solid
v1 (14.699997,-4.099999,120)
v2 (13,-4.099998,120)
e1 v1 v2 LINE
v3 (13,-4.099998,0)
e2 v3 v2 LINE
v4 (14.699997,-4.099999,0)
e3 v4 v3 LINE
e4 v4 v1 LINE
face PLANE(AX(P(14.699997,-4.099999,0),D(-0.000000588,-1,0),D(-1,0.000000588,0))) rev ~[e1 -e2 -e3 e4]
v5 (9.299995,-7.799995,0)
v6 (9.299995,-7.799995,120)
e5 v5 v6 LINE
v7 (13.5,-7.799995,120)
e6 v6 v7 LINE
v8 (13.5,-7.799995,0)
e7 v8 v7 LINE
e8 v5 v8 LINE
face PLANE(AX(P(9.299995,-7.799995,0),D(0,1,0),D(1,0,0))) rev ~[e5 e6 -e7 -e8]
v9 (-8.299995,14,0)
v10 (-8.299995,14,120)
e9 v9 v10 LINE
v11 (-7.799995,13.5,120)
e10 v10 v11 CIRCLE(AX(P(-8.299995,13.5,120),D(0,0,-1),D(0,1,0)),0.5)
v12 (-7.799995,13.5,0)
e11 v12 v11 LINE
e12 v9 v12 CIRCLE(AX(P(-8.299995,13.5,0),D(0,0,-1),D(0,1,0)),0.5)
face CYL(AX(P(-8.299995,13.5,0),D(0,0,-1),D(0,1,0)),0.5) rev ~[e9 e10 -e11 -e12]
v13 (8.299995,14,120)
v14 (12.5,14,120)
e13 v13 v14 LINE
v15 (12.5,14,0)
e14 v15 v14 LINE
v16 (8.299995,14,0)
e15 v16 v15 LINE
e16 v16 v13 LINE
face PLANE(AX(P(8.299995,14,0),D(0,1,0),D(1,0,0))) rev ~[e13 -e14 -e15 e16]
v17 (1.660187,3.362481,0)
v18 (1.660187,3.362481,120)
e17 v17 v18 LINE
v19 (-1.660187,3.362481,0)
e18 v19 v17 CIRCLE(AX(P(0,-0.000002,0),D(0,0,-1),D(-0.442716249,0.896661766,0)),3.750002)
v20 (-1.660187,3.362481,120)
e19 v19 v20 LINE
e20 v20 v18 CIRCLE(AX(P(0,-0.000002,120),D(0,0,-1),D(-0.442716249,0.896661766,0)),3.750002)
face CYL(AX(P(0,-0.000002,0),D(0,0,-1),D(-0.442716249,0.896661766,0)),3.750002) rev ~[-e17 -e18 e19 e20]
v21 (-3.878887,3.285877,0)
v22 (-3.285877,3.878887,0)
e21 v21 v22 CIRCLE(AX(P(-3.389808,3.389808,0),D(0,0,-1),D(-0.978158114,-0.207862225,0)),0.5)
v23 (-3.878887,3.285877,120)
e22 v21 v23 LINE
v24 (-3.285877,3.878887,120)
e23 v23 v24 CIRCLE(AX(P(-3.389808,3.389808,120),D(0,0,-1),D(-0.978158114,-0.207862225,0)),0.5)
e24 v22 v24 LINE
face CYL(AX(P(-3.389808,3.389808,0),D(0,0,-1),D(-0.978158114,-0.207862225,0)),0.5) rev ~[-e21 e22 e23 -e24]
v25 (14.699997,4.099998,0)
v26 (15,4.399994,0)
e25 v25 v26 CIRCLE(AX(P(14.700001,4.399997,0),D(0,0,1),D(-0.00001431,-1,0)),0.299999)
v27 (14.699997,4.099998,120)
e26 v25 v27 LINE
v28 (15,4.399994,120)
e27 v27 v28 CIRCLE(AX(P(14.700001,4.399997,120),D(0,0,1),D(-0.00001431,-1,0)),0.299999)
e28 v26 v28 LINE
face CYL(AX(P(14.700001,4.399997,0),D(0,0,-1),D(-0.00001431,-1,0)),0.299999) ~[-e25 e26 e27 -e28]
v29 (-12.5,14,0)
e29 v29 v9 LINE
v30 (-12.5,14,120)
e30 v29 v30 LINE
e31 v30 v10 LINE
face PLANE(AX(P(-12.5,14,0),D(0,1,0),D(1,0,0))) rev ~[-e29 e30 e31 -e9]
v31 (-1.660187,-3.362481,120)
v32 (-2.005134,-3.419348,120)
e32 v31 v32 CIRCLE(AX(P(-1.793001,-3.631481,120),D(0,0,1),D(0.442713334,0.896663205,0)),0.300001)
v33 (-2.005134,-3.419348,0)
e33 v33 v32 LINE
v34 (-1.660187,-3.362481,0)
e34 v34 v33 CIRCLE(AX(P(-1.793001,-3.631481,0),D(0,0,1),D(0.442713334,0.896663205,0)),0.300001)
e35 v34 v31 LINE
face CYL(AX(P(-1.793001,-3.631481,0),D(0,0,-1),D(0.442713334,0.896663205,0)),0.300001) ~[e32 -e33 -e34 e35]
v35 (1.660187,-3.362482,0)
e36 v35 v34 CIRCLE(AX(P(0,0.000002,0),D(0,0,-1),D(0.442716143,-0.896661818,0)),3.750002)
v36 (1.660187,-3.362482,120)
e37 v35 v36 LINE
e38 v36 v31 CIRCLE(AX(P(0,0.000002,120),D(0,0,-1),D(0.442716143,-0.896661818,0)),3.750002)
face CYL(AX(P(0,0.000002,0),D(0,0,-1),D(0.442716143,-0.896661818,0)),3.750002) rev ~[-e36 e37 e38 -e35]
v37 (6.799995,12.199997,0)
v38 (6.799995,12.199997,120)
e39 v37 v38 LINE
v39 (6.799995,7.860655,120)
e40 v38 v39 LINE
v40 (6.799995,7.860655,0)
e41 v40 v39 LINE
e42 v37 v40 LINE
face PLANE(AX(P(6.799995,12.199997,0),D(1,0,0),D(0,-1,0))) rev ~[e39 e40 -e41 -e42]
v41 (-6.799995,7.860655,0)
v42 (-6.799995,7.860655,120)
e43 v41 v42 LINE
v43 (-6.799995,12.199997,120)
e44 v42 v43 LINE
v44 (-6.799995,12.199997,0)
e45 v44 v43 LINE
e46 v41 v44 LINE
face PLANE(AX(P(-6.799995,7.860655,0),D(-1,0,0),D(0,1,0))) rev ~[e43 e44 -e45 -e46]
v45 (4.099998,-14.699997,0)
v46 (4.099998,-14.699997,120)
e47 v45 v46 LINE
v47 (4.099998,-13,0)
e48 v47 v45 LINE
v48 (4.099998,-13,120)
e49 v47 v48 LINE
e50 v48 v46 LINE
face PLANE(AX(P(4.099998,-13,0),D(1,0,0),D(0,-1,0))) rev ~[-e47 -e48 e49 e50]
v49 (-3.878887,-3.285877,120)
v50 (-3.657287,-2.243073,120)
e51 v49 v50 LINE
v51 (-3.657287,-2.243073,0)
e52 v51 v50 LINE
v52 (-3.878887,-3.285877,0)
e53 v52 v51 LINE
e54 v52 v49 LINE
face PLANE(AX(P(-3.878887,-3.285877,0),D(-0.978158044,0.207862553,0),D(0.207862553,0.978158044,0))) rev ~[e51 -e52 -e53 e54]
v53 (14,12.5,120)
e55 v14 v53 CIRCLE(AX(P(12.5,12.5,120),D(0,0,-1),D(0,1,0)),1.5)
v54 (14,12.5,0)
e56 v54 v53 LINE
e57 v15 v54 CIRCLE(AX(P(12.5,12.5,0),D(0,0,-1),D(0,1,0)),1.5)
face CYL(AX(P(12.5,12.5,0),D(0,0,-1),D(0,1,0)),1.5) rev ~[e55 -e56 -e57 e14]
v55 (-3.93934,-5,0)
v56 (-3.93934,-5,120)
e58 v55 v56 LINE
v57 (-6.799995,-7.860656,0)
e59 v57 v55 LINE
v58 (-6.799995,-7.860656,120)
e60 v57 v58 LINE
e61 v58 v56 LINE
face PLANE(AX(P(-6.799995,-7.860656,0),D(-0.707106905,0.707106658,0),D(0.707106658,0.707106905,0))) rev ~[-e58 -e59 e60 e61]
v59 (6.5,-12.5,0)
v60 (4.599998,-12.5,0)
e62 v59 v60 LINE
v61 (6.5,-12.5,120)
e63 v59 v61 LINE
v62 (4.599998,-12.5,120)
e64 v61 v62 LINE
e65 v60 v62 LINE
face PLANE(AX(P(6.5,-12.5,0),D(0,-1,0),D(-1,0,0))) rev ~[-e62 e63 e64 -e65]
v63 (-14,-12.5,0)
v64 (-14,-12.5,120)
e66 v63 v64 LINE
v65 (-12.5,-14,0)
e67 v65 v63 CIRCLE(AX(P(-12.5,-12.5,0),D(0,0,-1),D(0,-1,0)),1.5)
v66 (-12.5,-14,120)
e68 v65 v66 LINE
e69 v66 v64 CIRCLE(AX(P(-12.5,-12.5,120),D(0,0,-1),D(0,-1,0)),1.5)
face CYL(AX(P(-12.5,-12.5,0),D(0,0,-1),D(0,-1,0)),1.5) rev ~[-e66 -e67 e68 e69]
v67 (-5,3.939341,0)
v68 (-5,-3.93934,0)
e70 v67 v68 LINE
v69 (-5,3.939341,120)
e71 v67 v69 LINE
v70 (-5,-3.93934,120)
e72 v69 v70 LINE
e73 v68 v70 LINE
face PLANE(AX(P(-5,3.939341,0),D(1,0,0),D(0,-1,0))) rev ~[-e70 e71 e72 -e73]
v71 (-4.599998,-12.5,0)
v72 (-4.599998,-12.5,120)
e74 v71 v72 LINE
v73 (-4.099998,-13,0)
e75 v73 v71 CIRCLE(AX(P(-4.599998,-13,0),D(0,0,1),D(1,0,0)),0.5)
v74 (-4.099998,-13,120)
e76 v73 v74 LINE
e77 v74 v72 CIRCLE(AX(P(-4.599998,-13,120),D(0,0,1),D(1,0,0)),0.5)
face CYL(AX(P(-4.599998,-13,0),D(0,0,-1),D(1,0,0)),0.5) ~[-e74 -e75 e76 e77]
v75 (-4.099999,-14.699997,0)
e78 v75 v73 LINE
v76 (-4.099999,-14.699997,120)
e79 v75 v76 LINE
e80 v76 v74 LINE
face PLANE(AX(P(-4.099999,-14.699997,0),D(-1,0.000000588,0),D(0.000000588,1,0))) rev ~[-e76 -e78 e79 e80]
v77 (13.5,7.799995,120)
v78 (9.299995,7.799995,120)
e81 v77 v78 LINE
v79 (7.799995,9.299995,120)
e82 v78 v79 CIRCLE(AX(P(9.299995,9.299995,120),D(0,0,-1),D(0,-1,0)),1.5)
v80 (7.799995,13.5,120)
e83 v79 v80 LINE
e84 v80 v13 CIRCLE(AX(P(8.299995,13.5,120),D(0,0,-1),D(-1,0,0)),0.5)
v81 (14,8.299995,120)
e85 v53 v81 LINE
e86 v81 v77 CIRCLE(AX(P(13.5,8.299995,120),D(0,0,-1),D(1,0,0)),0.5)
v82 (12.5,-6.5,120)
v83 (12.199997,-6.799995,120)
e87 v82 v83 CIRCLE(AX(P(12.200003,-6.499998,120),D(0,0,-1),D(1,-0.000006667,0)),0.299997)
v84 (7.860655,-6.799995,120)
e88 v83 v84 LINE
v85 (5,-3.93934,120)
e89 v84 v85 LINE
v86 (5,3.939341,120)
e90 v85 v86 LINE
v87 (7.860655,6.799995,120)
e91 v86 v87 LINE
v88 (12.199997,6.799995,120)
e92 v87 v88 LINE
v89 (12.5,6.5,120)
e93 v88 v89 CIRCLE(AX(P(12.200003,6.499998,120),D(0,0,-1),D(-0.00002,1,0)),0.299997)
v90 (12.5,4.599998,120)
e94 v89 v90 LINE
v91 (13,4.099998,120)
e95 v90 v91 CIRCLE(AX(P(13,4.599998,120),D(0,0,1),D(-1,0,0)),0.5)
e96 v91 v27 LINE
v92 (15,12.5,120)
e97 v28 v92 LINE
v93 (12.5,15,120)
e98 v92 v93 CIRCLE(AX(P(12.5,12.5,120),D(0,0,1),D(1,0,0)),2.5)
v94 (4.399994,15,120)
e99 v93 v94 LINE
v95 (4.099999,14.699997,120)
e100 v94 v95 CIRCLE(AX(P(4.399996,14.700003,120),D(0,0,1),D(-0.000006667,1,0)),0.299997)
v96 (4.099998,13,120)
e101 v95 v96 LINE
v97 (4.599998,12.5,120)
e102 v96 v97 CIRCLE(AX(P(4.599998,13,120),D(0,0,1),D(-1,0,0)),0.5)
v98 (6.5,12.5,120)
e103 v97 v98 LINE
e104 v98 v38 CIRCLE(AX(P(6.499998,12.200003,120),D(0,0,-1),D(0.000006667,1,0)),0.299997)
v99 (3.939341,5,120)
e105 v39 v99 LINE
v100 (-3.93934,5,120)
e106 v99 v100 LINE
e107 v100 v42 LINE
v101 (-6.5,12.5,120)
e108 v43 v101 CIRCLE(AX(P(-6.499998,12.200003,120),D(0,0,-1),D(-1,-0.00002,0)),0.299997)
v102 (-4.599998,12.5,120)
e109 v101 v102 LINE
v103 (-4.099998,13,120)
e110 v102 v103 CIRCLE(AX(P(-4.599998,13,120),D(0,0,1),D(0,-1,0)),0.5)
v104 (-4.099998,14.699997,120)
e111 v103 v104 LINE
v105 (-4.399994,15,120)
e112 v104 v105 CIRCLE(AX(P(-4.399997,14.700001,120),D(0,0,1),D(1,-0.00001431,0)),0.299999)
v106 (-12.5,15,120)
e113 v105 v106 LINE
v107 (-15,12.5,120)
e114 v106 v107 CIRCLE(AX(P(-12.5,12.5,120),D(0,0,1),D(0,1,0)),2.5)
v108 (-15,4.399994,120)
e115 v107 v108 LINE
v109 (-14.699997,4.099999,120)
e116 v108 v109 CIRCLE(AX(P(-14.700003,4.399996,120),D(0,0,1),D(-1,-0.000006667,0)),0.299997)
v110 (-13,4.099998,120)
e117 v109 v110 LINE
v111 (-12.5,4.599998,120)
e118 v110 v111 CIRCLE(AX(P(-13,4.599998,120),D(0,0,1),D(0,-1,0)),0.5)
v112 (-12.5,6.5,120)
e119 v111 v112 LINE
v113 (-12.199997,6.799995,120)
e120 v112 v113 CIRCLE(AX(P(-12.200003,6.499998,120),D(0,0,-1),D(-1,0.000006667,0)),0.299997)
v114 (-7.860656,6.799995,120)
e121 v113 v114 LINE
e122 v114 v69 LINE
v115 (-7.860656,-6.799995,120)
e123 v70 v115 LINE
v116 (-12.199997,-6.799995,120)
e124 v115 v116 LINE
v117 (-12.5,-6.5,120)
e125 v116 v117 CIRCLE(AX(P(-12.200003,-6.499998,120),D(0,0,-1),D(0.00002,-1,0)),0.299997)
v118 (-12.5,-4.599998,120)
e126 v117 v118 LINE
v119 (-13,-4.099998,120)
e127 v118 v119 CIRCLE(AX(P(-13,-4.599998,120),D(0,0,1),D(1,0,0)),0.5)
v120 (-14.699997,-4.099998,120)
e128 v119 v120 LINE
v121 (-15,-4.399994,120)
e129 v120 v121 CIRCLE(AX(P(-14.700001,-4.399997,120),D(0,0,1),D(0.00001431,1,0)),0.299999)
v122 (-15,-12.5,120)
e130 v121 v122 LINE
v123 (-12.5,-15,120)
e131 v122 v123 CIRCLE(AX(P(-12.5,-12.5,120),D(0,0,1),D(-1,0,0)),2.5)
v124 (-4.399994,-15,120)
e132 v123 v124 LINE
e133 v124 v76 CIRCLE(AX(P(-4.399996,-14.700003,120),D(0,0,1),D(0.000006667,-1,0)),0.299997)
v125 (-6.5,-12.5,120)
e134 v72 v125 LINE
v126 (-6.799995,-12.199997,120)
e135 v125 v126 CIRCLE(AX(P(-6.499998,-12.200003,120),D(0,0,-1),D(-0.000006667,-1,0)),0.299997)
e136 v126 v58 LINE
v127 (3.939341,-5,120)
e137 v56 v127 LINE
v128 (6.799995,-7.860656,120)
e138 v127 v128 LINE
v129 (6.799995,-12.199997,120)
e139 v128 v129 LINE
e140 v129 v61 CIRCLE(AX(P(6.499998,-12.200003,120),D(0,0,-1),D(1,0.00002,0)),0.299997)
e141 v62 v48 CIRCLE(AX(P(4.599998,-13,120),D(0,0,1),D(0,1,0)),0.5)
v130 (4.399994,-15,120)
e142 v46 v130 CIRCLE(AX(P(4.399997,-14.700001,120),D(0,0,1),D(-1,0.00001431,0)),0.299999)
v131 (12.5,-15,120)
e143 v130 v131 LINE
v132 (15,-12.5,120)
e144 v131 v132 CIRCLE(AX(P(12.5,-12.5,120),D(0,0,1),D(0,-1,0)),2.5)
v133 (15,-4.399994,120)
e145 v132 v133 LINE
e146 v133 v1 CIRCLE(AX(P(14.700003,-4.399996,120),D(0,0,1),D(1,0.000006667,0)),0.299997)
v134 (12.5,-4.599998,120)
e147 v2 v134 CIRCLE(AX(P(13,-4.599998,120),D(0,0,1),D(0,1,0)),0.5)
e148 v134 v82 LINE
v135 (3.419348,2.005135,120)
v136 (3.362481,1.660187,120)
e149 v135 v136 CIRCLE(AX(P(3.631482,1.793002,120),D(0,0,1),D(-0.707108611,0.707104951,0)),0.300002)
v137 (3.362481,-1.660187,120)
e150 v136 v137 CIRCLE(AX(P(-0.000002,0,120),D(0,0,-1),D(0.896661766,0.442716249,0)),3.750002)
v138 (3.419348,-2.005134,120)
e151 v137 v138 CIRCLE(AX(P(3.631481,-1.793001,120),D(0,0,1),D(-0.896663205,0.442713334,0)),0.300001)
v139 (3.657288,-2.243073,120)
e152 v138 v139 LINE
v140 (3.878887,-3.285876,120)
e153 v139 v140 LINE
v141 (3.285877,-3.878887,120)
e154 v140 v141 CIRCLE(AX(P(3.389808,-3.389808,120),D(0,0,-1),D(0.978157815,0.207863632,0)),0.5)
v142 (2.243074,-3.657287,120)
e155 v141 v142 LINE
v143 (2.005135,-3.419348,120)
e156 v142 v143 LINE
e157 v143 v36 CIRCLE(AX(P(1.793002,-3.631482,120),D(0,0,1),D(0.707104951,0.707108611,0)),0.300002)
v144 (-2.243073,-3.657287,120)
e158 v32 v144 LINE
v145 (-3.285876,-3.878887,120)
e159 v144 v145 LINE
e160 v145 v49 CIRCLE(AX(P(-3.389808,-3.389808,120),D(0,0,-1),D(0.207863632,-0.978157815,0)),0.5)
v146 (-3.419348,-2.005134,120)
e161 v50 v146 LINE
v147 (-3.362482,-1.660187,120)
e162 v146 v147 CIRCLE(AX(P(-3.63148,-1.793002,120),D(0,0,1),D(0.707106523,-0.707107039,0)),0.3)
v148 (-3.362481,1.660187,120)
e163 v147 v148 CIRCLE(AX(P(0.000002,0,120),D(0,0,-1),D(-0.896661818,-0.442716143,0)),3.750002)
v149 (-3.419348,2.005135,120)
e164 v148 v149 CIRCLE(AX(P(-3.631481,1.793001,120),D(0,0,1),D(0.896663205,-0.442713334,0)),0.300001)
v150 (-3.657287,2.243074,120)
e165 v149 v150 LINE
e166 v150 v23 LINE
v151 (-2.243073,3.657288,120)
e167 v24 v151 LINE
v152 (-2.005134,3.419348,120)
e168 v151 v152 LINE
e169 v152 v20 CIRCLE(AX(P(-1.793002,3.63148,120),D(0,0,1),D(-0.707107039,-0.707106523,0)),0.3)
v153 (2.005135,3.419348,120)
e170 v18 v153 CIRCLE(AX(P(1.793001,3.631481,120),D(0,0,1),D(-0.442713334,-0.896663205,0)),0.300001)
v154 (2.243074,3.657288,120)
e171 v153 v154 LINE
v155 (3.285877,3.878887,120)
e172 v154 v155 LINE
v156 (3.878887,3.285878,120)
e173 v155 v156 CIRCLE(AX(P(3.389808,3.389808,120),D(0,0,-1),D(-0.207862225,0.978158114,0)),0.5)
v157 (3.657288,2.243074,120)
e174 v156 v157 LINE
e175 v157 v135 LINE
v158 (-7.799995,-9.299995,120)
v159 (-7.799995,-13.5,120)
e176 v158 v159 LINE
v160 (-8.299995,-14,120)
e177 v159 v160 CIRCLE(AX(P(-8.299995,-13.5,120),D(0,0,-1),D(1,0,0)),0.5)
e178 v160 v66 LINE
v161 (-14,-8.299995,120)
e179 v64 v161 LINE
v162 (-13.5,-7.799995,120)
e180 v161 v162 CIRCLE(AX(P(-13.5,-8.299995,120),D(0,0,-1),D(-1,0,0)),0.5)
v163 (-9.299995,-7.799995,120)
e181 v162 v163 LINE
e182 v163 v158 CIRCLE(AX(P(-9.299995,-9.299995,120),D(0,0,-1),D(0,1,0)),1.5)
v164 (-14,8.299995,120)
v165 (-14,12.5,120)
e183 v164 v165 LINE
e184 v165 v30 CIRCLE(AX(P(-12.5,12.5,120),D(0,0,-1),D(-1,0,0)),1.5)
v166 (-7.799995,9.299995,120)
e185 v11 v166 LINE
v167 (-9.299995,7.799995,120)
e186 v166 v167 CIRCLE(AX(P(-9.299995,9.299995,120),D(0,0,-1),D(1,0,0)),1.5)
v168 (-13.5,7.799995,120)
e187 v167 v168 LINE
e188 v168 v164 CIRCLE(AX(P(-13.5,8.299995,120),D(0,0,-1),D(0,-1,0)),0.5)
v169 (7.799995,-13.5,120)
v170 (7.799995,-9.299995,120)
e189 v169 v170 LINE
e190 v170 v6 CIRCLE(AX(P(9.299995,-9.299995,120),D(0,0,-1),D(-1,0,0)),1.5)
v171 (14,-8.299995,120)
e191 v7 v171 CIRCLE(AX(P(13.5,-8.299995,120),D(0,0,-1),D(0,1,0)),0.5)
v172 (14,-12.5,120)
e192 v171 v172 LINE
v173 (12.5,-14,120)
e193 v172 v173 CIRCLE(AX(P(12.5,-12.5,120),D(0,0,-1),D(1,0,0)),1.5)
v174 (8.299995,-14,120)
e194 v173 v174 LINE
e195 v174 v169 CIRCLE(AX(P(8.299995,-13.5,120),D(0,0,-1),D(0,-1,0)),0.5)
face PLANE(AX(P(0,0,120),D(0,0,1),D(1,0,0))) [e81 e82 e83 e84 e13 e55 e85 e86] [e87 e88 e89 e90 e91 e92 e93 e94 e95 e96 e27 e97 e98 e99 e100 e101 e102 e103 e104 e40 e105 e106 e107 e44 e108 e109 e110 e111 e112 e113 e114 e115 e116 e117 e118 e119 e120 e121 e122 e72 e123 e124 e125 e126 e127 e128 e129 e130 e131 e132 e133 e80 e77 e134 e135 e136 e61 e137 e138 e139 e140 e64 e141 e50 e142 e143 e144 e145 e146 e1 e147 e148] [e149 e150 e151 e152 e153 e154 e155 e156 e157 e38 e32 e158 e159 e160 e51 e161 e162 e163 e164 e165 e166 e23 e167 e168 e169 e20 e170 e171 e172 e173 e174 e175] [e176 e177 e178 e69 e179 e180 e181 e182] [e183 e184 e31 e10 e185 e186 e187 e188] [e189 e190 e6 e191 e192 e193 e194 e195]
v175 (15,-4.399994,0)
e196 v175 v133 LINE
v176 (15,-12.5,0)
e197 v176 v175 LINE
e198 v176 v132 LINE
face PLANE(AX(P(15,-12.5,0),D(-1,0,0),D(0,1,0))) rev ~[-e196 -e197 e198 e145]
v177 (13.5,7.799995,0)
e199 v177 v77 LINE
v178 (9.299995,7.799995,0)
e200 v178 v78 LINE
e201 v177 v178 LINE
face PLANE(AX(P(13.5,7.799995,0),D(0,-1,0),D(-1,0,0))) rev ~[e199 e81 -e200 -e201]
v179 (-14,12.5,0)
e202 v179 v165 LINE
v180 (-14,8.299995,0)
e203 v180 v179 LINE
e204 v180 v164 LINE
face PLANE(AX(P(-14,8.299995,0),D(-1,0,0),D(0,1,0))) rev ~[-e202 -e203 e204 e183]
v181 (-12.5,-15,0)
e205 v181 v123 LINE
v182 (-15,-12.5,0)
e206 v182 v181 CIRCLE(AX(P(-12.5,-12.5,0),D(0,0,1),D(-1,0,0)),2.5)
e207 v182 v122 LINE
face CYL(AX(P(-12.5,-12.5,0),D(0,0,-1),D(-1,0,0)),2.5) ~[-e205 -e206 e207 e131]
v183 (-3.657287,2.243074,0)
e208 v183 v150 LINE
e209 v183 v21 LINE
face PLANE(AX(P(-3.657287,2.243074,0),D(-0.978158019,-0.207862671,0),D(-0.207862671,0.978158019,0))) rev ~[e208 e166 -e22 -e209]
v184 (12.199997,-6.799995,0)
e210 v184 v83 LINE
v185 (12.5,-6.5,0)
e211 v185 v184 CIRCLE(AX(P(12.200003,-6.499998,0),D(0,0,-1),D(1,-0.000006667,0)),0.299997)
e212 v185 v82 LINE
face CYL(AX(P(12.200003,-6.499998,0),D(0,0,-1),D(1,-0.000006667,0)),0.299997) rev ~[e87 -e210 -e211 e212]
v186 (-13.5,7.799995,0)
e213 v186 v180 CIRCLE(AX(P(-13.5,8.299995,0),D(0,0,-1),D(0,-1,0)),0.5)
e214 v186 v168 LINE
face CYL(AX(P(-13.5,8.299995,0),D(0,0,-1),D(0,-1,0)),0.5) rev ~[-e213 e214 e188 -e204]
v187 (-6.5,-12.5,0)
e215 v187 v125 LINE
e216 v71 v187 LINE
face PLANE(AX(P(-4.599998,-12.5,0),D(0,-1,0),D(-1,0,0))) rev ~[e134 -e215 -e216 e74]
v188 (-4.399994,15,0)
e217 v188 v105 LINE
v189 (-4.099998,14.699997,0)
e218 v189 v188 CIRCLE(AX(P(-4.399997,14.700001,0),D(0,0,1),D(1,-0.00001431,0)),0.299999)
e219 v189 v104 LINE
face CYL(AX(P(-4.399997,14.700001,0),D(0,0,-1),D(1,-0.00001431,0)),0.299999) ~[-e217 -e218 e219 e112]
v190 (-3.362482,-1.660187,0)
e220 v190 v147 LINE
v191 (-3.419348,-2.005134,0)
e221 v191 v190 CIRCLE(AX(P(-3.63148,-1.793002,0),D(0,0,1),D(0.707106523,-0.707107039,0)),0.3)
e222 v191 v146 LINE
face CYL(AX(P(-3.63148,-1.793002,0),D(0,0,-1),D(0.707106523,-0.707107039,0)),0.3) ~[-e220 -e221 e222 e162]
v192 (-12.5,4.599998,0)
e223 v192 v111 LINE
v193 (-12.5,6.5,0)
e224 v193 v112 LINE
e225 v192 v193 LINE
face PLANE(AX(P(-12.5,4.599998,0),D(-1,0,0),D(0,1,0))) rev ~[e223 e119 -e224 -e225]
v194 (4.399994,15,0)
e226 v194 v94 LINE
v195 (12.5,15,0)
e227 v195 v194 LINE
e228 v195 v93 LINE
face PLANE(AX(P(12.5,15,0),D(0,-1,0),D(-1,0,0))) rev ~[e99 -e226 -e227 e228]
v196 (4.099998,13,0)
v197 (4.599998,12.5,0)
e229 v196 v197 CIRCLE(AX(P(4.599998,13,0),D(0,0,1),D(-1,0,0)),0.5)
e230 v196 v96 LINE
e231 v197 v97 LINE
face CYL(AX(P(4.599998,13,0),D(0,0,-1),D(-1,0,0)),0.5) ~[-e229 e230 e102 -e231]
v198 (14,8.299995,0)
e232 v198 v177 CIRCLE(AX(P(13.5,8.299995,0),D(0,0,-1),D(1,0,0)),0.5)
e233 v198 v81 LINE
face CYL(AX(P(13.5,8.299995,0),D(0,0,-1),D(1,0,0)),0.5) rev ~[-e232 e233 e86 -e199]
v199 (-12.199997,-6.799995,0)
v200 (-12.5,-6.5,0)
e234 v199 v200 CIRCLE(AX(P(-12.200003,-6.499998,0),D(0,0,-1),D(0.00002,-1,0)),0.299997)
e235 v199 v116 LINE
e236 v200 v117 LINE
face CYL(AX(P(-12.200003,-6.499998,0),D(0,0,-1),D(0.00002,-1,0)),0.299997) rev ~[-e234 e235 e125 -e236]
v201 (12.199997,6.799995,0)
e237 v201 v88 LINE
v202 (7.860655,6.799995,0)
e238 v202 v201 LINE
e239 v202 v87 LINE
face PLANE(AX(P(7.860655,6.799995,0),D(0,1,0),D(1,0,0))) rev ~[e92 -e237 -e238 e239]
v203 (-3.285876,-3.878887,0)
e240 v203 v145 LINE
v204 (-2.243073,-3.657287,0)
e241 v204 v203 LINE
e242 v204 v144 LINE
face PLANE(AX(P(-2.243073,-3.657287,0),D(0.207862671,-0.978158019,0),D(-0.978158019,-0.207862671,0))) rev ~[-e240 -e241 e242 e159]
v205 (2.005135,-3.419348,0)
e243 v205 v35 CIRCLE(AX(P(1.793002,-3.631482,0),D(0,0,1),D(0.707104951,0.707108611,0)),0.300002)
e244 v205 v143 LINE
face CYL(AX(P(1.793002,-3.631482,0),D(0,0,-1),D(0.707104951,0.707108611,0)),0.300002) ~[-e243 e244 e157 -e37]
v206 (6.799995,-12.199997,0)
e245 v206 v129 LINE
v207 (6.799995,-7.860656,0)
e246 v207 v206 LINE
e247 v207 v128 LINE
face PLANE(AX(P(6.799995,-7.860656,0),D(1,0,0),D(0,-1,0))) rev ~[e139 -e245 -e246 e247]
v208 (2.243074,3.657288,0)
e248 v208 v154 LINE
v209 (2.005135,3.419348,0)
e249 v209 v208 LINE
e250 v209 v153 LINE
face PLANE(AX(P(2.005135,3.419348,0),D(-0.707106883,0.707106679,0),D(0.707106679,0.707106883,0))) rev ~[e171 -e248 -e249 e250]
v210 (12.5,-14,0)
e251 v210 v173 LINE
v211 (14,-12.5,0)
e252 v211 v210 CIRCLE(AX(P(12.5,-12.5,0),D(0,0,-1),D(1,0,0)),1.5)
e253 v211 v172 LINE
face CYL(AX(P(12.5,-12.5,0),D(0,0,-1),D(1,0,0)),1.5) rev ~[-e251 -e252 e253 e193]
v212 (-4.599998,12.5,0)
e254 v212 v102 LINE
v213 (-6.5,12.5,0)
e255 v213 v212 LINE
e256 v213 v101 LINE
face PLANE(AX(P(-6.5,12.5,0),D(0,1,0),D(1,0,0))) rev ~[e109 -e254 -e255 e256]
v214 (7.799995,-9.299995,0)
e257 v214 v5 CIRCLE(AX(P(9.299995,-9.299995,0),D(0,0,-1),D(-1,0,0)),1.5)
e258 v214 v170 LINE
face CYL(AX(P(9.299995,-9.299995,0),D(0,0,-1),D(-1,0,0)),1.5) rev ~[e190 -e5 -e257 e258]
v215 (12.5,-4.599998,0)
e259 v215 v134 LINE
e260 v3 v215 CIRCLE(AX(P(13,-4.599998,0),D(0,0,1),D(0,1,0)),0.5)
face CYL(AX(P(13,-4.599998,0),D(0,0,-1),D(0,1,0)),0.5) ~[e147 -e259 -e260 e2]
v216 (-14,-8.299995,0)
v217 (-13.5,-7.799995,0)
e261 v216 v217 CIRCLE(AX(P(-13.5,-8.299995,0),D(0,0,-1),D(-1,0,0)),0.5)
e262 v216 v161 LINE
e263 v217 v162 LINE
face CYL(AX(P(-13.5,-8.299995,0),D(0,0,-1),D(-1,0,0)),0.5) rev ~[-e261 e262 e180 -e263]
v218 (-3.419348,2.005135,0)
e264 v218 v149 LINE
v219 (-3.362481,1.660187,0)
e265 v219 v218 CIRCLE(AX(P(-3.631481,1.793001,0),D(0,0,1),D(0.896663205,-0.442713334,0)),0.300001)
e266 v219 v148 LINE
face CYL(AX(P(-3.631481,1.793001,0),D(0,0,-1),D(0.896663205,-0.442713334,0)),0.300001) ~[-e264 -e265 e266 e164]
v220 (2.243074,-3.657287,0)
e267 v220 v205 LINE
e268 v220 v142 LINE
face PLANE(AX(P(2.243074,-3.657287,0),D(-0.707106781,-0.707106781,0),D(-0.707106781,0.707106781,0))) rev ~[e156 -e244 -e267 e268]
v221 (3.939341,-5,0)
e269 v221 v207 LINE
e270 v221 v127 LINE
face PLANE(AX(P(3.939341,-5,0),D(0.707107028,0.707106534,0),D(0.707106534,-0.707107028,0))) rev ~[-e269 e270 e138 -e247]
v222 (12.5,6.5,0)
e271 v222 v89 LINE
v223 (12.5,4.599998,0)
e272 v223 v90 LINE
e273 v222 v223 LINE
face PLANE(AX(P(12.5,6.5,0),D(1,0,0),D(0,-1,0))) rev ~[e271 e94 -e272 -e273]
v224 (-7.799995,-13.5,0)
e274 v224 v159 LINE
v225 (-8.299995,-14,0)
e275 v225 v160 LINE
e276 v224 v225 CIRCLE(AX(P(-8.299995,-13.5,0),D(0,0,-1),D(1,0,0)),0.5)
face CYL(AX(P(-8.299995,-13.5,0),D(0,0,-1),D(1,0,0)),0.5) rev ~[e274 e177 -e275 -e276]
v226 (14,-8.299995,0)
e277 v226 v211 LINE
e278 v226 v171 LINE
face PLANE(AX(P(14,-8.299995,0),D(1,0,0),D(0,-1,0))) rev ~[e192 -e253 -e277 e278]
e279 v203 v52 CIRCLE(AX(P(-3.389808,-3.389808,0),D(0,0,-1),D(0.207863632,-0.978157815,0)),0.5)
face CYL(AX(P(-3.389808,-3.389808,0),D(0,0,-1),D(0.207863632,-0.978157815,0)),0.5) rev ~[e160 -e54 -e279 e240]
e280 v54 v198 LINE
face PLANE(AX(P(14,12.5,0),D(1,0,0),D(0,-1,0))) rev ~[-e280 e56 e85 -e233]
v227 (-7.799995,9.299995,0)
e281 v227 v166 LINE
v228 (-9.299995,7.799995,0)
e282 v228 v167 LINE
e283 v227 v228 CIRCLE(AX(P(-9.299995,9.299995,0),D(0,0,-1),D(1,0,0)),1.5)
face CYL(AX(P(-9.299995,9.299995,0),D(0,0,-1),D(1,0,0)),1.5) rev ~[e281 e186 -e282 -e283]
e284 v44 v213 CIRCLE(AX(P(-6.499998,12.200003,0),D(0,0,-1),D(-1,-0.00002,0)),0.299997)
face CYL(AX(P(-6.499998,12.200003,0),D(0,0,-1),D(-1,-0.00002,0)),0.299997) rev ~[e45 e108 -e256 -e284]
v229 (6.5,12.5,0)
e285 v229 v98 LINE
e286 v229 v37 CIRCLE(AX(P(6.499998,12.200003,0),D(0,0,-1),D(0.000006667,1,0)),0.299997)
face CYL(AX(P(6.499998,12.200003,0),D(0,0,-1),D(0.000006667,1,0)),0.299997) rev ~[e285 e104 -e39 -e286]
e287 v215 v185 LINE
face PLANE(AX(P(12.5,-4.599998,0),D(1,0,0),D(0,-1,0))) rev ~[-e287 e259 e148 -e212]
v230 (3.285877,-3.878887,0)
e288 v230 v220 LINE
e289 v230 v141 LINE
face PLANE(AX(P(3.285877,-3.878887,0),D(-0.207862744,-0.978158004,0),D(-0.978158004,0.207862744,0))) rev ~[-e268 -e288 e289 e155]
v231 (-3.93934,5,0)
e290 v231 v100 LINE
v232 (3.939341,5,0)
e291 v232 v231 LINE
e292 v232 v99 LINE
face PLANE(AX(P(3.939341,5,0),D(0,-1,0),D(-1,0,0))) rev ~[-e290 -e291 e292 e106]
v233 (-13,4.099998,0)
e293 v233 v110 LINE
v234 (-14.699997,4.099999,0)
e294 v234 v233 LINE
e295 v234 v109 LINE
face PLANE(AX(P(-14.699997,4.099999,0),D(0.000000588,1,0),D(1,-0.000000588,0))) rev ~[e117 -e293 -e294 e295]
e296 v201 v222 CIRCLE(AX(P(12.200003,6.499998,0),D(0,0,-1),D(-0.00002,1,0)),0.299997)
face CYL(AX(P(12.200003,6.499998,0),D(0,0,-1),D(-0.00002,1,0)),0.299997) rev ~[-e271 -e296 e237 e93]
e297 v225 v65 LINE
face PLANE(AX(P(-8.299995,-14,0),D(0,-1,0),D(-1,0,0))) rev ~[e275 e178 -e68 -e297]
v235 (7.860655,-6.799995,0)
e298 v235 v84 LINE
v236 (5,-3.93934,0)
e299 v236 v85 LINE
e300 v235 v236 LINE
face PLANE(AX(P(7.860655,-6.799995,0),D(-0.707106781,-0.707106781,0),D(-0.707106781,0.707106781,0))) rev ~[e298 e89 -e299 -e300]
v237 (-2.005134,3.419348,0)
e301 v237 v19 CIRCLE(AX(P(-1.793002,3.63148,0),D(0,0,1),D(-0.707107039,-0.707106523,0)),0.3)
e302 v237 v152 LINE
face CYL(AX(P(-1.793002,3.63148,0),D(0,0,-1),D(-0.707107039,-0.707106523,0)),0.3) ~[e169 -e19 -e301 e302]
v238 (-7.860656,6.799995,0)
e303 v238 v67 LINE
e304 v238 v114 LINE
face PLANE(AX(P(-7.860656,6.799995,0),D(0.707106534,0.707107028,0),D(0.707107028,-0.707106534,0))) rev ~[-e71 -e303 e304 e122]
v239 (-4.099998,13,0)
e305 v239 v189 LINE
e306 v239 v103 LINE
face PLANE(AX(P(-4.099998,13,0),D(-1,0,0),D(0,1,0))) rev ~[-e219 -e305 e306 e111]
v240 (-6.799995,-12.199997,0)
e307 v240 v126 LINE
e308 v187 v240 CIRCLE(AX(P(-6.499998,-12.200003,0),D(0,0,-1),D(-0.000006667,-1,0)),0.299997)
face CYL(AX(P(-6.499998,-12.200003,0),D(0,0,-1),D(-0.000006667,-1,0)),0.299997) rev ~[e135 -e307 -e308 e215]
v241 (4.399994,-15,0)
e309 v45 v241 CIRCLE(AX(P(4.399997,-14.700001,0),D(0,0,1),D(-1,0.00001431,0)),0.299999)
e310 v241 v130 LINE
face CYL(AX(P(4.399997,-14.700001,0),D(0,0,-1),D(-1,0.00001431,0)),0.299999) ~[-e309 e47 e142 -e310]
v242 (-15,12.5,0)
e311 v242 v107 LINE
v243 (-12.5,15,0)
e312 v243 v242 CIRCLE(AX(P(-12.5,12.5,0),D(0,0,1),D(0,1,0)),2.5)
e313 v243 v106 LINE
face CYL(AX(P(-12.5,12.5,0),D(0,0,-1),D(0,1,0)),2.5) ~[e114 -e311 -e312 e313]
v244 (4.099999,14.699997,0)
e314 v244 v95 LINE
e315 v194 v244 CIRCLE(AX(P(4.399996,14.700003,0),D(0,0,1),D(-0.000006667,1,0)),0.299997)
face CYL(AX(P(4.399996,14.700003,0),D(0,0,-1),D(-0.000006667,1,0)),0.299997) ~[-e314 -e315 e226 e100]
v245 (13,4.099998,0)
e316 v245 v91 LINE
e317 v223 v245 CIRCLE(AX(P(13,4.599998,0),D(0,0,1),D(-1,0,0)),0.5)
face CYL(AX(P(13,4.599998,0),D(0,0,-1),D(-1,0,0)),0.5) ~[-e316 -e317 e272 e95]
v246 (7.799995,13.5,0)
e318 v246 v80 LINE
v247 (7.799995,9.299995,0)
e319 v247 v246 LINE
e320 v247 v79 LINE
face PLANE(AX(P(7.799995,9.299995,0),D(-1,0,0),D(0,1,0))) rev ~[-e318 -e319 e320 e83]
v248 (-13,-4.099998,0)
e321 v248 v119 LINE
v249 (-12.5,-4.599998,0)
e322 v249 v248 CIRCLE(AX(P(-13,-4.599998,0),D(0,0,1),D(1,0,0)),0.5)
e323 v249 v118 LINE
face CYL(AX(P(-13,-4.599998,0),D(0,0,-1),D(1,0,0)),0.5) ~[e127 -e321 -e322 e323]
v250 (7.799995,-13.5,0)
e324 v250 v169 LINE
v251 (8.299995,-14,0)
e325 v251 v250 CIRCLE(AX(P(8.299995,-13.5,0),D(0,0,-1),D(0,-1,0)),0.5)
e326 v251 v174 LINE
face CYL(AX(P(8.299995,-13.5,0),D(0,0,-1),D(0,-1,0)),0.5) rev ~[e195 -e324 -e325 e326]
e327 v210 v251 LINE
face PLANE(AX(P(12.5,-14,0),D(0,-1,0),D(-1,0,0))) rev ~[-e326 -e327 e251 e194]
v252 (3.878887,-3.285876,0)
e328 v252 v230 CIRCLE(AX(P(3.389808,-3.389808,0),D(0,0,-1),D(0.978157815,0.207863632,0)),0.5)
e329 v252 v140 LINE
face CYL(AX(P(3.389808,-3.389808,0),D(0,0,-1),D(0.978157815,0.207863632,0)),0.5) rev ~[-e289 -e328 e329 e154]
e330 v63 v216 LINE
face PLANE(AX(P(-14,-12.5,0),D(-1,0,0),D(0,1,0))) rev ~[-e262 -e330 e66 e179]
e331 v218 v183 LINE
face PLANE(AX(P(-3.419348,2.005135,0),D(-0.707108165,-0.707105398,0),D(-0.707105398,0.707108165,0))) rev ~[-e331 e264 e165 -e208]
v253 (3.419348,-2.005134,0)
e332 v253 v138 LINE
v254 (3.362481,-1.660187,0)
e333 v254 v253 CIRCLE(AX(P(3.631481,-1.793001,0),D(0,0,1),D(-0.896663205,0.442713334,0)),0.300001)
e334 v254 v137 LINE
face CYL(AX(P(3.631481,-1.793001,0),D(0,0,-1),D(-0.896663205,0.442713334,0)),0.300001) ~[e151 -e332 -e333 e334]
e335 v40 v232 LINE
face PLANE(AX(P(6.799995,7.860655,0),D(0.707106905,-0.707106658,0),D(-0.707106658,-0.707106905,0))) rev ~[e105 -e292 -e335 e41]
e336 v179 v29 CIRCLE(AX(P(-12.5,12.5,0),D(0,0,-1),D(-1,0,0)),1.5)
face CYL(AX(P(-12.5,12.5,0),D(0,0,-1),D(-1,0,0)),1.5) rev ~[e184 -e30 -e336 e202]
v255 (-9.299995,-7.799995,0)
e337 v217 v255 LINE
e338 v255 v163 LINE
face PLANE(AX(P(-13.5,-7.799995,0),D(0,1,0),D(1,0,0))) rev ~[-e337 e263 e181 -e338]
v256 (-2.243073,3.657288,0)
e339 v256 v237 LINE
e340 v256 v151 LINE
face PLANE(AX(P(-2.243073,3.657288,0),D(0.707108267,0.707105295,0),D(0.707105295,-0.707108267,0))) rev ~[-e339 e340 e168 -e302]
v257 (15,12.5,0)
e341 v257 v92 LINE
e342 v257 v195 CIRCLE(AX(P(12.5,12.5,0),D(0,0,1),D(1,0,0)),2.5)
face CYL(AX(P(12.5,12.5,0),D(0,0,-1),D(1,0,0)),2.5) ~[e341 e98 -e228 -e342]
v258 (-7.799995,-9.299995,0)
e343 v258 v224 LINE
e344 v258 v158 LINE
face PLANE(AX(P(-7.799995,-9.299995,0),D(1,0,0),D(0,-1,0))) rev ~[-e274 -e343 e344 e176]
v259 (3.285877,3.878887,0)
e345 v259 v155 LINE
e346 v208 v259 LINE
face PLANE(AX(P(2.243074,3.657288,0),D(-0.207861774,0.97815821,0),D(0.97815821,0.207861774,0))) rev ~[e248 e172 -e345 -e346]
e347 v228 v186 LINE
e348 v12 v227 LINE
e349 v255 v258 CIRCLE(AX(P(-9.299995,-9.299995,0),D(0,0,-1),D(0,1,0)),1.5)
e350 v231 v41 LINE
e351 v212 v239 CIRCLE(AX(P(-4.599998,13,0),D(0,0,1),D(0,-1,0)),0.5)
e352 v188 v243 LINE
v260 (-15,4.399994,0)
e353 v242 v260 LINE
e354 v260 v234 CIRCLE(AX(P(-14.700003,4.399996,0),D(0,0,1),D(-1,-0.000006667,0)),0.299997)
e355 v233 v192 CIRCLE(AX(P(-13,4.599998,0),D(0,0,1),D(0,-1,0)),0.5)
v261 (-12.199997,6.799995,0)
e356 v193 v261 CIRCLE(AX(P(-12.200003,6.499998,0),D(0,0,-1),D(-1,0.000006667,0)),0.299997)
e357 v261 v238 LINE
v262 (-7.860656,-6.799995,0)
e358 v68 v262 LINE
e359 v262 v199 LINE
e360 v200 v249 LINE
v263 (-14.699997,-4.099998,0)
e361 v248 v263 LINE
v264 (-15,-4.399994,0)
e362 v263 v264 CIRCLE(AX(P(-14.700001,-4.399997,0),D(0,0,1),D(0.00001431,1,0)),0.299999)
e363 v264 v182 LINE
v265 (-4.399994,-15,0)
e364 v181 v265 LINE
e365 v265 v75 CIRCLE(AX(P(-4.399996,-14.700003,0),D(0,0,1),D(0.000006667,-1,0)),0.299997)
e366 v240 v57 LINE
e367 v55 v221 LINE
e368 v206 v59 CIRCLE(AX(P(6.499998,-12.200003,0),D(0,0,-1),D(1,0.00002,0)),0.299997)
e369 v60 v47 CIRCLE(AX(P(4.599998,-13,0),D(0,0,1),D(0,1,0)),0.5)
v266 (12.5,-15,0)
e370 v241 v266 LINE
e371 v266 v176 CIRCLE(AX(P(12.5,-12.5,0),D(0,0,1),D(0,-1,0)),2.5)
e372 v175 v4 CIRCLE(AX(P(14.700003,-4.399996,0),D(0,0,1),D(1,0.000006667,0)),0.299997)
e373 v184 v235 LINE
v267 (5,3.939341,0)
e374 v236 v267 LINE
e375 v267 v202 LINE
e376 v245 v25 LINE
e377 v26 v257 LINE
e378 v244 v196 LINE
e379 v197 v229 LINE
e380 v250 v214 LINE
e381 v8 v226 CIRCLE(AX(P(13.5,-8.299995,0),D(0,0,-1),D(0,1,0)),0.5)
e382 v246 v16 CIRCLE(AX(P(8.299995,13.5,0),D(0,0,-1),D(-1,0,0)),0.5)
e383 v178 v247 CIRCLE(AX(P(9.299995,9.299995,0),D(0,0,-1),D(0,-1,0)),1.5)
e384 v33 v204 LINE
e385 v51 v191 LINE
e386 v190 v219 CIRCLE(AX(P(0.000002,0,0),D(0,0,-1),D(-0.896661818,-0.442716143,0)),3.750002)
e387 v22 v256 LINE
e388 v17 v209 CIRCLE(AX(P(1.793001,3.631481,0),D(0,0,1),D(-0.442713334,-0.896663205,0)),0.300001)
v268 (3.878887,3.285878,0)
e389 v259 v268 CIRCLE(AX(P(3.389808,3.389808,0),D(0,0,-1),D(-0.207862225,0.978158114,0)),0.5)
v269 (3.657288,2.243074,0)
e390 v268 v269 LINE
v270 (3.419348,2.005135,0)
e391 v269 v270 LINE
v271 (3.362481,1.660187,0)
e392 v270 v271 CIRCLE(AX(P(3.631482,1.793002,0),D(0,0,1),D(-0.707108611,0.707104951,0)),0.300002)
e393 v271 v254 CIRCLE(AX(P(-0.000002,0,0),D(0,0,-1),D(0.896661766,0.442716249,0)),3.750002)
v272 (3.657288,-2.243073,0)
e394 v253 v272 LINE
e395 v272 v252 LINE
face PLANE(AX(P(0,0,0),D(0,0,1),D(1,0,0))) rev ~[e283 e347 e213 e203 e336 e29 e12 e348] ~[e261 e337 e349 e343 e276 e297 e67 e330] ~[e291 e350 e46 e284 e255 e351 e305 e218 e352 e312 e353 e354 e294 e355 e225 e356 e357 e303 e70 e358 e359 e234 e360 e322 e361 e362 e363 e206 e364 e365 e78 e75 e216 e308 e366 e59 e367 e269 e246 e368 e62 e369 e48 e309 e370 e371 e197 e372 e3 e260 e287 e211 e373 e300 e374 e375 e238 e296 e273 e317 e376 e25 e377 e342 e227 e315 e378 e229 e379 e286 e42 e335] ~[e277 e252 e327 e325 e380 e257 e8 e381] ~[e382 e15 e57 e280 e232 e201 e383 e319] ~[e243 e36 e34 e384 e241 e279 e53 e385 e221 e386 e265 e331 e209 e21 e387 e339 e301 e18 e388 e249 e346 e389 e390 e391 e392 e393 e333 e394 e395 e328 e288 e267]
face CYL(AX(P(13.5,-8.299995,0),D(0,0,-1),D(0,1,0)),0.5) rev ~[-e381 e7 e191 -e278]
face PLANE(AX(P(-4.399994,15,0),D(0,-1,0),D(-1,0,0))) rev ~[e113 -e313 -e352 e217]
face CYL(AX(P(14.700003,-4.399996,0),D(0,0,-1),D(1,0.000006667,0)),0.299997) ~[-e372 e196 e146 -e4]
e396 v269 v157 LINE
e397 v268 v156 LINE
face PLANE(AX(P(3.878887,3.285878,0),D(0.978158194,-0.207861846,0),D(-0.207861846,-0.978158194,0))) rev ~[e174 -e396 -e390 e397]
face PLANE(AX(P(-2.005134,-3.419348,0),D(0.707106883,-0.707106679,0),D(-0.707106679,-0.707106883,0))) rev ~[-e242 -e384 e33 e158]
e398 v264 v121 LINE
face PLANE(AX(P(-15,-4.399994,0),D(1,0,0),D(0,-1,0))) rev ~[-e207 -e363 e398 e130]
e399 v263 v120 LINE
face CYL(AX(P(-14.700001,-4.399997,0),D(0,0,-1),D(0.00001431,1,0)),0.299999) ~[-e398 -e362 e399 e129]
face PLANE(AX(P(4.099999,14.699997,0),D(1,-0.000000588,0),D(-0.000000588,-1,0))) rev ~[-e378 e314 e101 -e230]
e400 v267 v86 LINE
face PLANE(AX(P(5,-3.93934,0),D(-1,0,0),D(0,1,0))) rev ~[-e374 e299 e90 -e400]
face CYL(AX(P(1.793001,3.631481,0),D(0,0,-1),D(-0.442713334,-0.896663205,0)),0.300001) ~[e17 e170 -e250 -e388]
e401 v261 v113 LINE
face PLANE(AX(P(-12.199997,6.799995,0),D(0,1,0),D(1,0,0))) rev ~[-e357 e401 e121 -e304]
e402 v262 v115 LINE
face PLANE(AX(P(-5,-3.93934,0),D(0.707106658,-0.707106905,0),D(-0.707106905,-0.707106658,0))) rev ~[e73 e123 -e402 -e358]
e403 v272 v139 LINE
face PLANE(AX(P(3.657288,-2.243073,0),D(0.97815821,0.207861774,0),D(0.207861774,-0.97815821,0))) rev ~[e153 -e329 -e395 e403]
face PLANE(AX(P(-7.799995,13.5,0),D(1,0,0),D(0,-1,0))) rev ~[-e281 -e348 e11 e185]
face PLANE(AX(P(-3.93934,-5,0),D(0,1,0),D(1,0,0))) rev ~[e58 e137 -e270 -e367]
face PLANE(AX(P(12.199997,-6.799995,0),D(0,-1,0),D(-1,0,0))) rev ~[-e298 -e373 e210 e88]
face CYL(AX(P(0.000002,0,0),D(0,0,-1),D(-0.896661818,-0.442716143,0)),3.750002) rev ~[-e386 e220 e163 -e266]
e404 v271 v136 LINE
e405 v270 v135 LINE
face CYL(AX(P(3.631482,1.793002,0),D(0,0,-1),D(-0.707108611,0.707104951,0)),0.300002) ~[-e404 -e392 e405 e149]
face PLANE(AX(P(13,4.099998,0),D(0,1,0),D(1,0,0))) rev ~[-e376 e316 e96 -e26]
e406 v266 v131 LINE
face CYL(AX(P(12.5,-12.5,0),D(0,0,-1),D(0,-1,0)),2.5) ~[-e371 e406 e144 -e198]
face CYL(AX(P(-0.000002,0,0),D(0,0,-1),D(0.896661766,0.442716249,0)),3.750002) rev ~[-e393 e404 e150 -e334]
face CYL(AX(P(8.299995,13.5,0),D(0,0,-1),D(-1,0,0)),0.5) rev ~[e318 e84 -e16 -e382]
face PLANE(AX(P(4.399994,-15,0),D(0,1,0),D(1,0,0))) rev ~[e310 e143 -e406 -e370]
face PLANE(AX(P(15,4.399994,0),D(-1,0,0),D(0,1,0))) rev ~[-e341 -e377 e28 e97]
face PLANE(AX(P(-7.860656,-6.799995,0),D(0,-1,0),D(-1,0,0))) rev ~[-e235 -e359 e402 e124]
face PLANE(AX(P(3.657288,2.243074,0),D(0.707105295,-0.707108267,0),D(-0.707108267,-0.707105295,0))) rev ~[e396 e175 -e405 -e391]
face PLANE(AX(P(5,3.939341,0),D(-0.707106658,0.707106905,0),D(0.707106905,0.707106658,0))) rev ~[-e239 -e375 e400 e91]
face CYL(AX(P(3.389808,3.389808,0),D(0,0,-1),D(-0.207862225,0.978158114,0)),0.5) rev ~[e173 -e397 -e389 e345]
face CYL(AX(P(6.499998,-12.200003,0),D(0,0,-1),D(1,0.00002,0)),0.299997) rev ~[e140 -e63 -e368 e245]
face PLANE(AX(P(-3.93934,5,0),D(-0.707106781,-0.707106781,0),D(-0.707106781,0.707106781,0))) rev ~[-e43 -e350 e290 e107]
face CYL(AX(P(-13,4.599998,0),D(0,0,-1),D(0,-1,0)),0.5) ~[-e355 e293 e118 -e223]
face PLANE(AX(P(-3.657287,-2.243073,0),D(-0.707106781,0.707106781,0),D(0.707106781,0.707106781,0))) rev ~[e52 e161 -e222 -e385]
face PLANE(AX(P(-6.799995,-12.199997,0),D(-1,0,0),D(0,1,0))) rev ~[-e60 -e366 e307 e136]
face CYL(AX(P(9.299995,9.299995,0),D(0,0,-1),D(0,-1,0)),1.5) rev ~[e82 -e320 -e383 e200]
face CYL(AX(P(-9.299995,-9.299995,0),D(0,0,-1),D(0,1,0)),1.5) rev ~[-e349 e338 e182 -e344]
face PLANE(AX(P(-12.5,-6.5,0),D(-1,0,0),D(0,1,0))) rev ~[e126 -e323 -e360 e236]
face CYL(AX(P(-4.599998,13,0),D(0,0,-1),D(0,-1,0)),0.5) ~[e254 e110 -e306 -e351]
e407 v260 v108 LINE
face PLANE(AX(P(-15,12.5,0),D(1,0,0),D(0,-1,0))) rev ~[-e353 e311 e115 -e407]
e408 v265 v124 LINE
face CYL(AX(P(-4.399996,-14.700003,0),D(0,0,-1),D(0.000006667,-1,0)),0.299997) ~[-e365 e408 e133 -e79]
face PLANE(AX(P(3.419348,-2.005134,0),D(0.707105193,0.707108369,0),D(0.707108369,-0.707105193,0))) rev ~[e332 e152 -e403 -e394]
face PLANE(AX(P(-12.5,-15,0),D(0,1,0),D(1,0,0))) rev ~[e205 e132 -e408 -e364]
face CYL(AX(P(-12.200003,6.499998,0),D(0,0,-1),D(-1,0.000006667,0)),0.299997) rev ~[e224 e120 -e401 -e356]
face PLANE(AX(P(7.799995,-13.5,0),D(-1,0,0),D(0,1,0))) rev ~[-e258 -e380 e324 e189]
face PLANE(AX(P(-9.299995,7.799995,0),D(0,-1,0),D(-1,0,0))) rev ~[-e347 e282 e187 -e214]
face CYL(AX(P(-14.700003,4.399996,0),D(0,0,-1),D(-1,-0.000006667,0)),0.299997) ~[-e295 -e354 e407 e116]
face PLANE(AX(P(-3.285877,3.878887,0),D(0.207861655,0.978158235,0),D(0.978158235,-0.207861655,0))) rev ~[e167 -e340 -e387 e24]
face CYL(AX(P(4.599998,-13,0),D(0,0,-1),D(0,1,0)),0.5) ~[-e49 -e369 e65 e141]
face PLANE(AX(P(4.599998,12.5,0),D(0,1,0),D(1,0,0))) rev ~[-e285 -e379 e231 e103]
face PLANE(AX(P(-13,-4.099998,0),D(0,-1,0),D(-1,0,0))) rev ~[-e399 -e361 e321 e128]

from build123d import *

# Parameters (mm, degrees)
F1_DEPTH = 120


# Not quite as in the source:
# - ends of sketch curves that miss each other by under 0.0002 mm in the source are joined
# - the program builds the solid bodies; features that only make, move or delete a surface that nothing else refers to are left out


with BuildPart() as f1:
    # F0 (on Top) → F1 (new body)
    with BuildSketch(Plane.XY):
        with BuildLine():
            Line((3.939341, -5), (6.799995, -7.860656))
            Line((6.799995, -7.860656), (6.799995, -12.199997))
            ThreePointArc((6.799995, -12.199997), (6.7121307415, -12.4121300846), (6.5, -12.5))
            Line((6.5, -12.5), (4.599998, -12.5))
            ThreePointArc((4.599998, -12.5), (4.2464446094, -12.6464466094), (4.099998, -13))
            Line((4.099998, -13), (4.099998, -14.699997))
            ThreePointArc((4.099998, -14.699997), (4.1878632585, -14.9121300846), (4.399994, -15))
            Line((4.399994, -15), (12.5, -15))
            ThreePointArc((12.5, -15), (14.267766953, -14.267766953), (15, -12.5))
            Line((15, -12.5), (15, -4.399994))
            ThreePointArc((15, -4.399994), (14.9121300846, -4.1878632585), (14.699997, -4.099999))
            Line((14.699997, -4.099999), (13, -4.099998))
            ThreePointArc((13, -4.099998), (12.6464466094, -4.2464446094), (12.5, -4.599998))
            Line((12.5, -4.599998), (12.5, -6.5))
            ThreePointArc((12.5, -6.5), (12.4121300846, -6.7121307415), (12.199997, -6.799995))
            Line((12.199997, -6.799995), (7.860655, -6.799995))
            Line((7.860655, -6.799995), (5, -3.93934))
            Line((5, -3.93934), (5, 3.939341))
            Line((5, 3.939341), (7.860655, 6.799995))
            Line((7.860655, 6.799995), (12.199997, 6.799995))
            ThreePointArc((12.199997, 6.799995), (12.4121300846, 6.7121307415), (12.5, 6.5))
            Line((12.5, 6.5), (12.5, 4.599998))
            ThreePointArc((12.5, 4.599998), (12.6464466094, 4.2464446094), (13, 4.099998))
            Line((13, 4.099998), (14.699997, 4.099998))
            ThreePointArc((14.699997, 4.099998), (14.9121300846, 4.1878632585), (15, 4.399994))
            Line((15, 4.399994), (15, 12.5))
            ThreePointArc((15, 12.5), (14.267766953, 14.267766953), (12.5, 15))
            Line((12.5, 15), (4.399994, 15))
            ThreePointArc((4.399994, 15), (4.1878632585, 14.9121300846), (4.099999, 14.699997))
            Line((4.099999, 14.699997), (4.099998, 13))
            ThreePointArc((4.099998, 13), (4.2464446094, 12.6464466094), (4.599998, 12.5))
            Line((4.599998, 12.5), (6.5, 12.5))
            ThreePointArc((6.5, 12.5), (6.7121307415, 12.4121300846), (6.799995, 12.199997))
            Line((6.799995, 12.199997), (6.799995, 7.860655))
            Line((6.799995, 7.860655), (3.939341, 5))
            Line((3.939341, 5), (-3.93934, 5))
            Line((-3.93934, 5), (-6.799995, 7.860655))
            Line((-6.799995, 7.860655), (-6.799995, 12.199997))
            ThreePointArc((-6.799995, 12.199997), (-6.7121307415, 12.4121300846), (-6.5, 12.5))
            Line((-6.5, 12.5), (-4.599998, 12.5))
            ThreePointArc((-4.599998, 12.5), (-4.2464446094, 12.6464466094), (-4.099998, 13))
            Line((-4.099998, 13), (-4.099998, 14.699997))
            ThreePointArc((-4.099998, 14.699997), (-4.1878632585, 14.9121300846), (-4.399994, 15))
            Line((-4.399994, 15), (-12.5, 15))
            ThreePointArc((-12.5, 15), (-14.267766953, 14.267766953), (-15, 12.5))
            Line((-15, 12.5), (-15, 4.399994))
            ThreePointArc((-15, 4.399994), (-14.9121300846, 4.1878632585), (-14.699997, 4.099999))
            Line((-14.699997, 4.099999), (-13, 4.099998))
            ThreePointArc((-13, 4.099998), (-12.6464466094, 4.2464446094), (-12.5, 4.599998))
            Line((-12.5, 4.599998), (-12.5, 6.5))
            ThreePointArc((-12.5, 6.5), (-12.4121300846, 6.7121307415), (-12.199997, 6.799995))
            Line((-12.199997, 6.799995), (-7.860656, 6.799995))
            Line((-7.860656, 6.799995), (-5, 3.939341))
            Line((-5, 3.939341), (-5, -3.93934))
            Line((-5, -3.93934), (-7.860656, -6.799995))
            Line((-7.860656, -6.799995), (-12.199997, -6.799995))
            ThreePointArc((-12.199997, -6.799995), (-12.4121300846, -6.7121307415), (-12.5, -6.5))
            Line((-12.5, -6.5), (-12.5, -4.599998))
            ThreePointArc((-12.5, -4.599998), (-12.6464466094, -4.2464446094), (-13, -4.099998))
            Line((-13, -4.099998), (-14.699997, -4.099998))
            ThreePointArc((-14.699997, -4.099998), (-14.9121300846, -4.1878632585), (-15, -4.399994))
            Line((-15, -4.399994), (-15, -12.5))
            ThreePointArc((-15, -12.5), (-14.267766953, -14.267766953), (-12.5, -15))
            Line((-12.5, -15), (-4.399994, -15))
            ThreePointArc((-4.399994, -15), (-4.1878632585, -14.9121300846), (-4.099999, -14.699997))
            Line((-4.099999, -14.699997), (-4.099998, -13))
            ThreePointArc((-4.099998, -13), (-4.2464446094, -12.6464466094), (-4.599998, -12.5))
            Line((-4.599998, -12.5), (-6.5, -12.5))
            ThreePointArc((-6.5, -12.5), (-6.7121307415, -12.4121300846), (-6.799995, -12.199997))
            Line((-6.799995, -12.199997), (-6.799995, -7.860656))
            Line((-6.799995, -7.860656), (-3.93934, -5))
            Line((-3.93934, -5), (3.939341, -5))
        make_face()
        with BuildLine():
            Line((-8.299995, -14), (-12.5, -14))
            ThreePointArc((-12.5, -14), (-13.5606601718, -13.5606601718), (-14, -12.5))
            Line((-14, -12.5), (-14, -8.299995))
            ThreePointArc((-14, -8.299995), (-13.8535533906, -7.9464416094), (-13.5, -7.799995))
            Line((-13.5, -7.799995), (-9.299995, -7.799995))
            ThreePointArc((-9.299995, -7.799995), (-8.2393348282, -8.2393348282), (-7.799995, -9.299995))
            Line((-7.799995, -9.299995), (-7.799995, -13.5))
            ThreePointArc((-7.799995, -13.5), (-7.9464416094, -13.8535533906), (-8.299995, -14))
        make_face(mode=Mode.SUBTRACT)
        with BuildLine():
            Line((12.5, -14), (8.299995, -14))
            ThreePointArc((8.299995, -14), (7.9464416094, -13.8535533906), (7.799995, -13.5))
            Line((7.799995, -13.5), (7.799995, -9.299995))
            ThreePointArc((7.799995, -9.299995), (8.2393348282, -8.2393348282), (9.299995, -7.799995))
            Line((9.299995, -7.799995), (13.5, -7.799995))
            ThreePointArc((13.5, -7.799995), (13.8535533906, -7.9464416094), (14, -8.299995))
            Line((14, -8.299995), (14, -12.5))
            ThreePointArc((14, -12.5), (13.5606601718, -13.5606601718), (12.5, -14))
        make_face(mode=Mode.SUBTRACT)
        with BuildLine():
            Line((3.657288, -2.243073), (3.878887, -3.285876))
            ThreePointArc((3.878887, -3.285876), (3.7433613906, -3.7433613906), (3.2858769836, -3.8788870773))
            Line((3.2858769836, -3.8788870773), (2.243074, -3.657287))
            Line((2.243074, -3.657287), (2.005135, -3.419348))
            ThreePointArc((2.005135, -3.419348), (1.841799908, -3.3354753308), (1.6601868142, -3.3624816237))
            ThreePointArc((1.6601868142, -3.3624816237), (0, -3.75), (-1.6601870383, -3.3624810777))
            ThreePointArc((-1.6601870383, -3.3624810777), (-1.841799908, -3.3354753308), (-2.0051340344, -3.4193479656))
            Line((-2.0051340344, -3.4193479656), (-2.243073, -3.657287))
            Line((-2.243073, -3.657287), (-3.285876, -3.878887))
            ThreePointArc((-3.285876, -3.878887), (-3.7433613906, -3.7433613906), (-3.8788870773, -3.2858769836))
            Line((-3.8788870773, -3.2858769836), (-3.657287, -2.243073))
            Line((-3.657287, -2.243073), (-3.419348, -2.005134))
            ThreePointArc((-3.419348, -2.005134), (-3.3354753308, -1.841799908), (-3.3624816237, -1.6601868142))
            ThreePointArc((-3.3624816237, -1.6601868142), (-3.75, 0), (-3.3624810777, 1.6601870383))
            ThreePointArc((-3.3624810777, 1.6601870383), (-3.3354753883, 1.8418002569), (-3.4193484656, 2.0051345344))
            Line((-3.4193484656, 2.0051345344), (-3.657287, 2.243074))
            Line((-3.657287, 2.243074), (-3.878887, 3.285877))
            ThreePointArc((-3.878887, 3.285877), (-3.7433613906, 3.7433613906), (-3.2858769836, 3.8788870773))
            Line((-3.2858769836, 3.8788870773), (-2.243073, 3.657288))
            Line((-2.243073, 3.657288), (-2.005134, 3.419348))
            ThreePointArc((-2.005134, 3.419348), (-1.8418001264, 3.3354753668), (-1.6601872112, 3.3624814277))
            ThreePointArc((-1.6601872112, 3.3624814277), (0, 3.75), (1.6601870383, 3.3624810777))
            ThreePointArc((1.6601870383, 3.3624810777), (1.8418002569, 3.3354753883), (2.0051345344, 3.4193484656))
            Line((2.0051345344, 3.4193484656), (2.243074, 3.657288))
            Line((2.243074, 3.657288), (3.285877, 3.878887))
            ThreePointArc((3.285877, 3.878887), (3.7433610448, 3.7433617364), (3.8788872806, 3.2858779404))
            Line((3.8788872806, 3.2858779404), (3.657288, 2.243074))
            Line((3.657288, 2.243074), (3.419348, 2.005135))
            ThreePointArc((3.419348, 2.005135), (3.3354753668, 1.8418001264), (3.3624814277, 1.6601872112))
            ThreePointArc((3.3624814277, 1.6601872112), (3.75, 0), (3.3624810777, -1.6601870383))
            ThreePointArc((3.3624810777, -1.6601870383), (3.3354753308, -1.841799908), (3.4193479656, -2.0051340344))
            Line((3.4193479656, -2.0051340344), (3.657288, -2.243073))
        make_face(mode=Mode.SUBTRACT)
        with BuildLine():
            Line((-9.299995, 7.799995), (-13.5, 7.799995))
            ThreePointArc((-13.5, 7.799995), (-13.8535533906, 7.9464416094), (-14, 8.299995))
            Line((-14, 8.299995), (-14, 12.5))
            ThreePointArc((-14, 12.5), (-13.5606601718, 13.5606601718), (-12.5, 14))
            Line((-12.5, 14), (-8.299995, 14))
            ThreePointArc((-8.299995, 14), (-7.9464416094, 13.8535533906), (-7.799995, 13.5))
            Line((-7.799995, 13.5), (-7.799995, 9.299995))
            ThreePointArc((-7.799995, 9.299995), (-8.2393348282, 8.2393348282), (-9.299995, 7.799995))
        make_face(mode=Mode.SUBTRACT)
        with BuildLine():
            Line((13.5, 7.799995), (9.299995, 7.799995))
            ThreePointArc((9.299995, 7.799995), (8.2393348282, 8.2393348282), (7.799995, 9.299995))
            Line((7.799995, 9.299995), (7.799995, 13.5))
            ThreePointArc((7.799995, 13.5), (7.9464416094, 13.8535533906), (8.299995, 14))
            Line((8.299995, 14), (12.5, 14))
            ThreePointArc((12.5, 14), (13.5606601718, 13.5606601718), (14, 12.5))
            Line((14, 12.5), (14, 8.299995))
            ThreePointArc((14, 8.299995), (13.8535533906, 7.9464416094), (13.5, 7.799995))
        make_face(mode=Mode.SUBTRACT)
    extrude(amount=F1_DEPTH)


solid = f1.part
